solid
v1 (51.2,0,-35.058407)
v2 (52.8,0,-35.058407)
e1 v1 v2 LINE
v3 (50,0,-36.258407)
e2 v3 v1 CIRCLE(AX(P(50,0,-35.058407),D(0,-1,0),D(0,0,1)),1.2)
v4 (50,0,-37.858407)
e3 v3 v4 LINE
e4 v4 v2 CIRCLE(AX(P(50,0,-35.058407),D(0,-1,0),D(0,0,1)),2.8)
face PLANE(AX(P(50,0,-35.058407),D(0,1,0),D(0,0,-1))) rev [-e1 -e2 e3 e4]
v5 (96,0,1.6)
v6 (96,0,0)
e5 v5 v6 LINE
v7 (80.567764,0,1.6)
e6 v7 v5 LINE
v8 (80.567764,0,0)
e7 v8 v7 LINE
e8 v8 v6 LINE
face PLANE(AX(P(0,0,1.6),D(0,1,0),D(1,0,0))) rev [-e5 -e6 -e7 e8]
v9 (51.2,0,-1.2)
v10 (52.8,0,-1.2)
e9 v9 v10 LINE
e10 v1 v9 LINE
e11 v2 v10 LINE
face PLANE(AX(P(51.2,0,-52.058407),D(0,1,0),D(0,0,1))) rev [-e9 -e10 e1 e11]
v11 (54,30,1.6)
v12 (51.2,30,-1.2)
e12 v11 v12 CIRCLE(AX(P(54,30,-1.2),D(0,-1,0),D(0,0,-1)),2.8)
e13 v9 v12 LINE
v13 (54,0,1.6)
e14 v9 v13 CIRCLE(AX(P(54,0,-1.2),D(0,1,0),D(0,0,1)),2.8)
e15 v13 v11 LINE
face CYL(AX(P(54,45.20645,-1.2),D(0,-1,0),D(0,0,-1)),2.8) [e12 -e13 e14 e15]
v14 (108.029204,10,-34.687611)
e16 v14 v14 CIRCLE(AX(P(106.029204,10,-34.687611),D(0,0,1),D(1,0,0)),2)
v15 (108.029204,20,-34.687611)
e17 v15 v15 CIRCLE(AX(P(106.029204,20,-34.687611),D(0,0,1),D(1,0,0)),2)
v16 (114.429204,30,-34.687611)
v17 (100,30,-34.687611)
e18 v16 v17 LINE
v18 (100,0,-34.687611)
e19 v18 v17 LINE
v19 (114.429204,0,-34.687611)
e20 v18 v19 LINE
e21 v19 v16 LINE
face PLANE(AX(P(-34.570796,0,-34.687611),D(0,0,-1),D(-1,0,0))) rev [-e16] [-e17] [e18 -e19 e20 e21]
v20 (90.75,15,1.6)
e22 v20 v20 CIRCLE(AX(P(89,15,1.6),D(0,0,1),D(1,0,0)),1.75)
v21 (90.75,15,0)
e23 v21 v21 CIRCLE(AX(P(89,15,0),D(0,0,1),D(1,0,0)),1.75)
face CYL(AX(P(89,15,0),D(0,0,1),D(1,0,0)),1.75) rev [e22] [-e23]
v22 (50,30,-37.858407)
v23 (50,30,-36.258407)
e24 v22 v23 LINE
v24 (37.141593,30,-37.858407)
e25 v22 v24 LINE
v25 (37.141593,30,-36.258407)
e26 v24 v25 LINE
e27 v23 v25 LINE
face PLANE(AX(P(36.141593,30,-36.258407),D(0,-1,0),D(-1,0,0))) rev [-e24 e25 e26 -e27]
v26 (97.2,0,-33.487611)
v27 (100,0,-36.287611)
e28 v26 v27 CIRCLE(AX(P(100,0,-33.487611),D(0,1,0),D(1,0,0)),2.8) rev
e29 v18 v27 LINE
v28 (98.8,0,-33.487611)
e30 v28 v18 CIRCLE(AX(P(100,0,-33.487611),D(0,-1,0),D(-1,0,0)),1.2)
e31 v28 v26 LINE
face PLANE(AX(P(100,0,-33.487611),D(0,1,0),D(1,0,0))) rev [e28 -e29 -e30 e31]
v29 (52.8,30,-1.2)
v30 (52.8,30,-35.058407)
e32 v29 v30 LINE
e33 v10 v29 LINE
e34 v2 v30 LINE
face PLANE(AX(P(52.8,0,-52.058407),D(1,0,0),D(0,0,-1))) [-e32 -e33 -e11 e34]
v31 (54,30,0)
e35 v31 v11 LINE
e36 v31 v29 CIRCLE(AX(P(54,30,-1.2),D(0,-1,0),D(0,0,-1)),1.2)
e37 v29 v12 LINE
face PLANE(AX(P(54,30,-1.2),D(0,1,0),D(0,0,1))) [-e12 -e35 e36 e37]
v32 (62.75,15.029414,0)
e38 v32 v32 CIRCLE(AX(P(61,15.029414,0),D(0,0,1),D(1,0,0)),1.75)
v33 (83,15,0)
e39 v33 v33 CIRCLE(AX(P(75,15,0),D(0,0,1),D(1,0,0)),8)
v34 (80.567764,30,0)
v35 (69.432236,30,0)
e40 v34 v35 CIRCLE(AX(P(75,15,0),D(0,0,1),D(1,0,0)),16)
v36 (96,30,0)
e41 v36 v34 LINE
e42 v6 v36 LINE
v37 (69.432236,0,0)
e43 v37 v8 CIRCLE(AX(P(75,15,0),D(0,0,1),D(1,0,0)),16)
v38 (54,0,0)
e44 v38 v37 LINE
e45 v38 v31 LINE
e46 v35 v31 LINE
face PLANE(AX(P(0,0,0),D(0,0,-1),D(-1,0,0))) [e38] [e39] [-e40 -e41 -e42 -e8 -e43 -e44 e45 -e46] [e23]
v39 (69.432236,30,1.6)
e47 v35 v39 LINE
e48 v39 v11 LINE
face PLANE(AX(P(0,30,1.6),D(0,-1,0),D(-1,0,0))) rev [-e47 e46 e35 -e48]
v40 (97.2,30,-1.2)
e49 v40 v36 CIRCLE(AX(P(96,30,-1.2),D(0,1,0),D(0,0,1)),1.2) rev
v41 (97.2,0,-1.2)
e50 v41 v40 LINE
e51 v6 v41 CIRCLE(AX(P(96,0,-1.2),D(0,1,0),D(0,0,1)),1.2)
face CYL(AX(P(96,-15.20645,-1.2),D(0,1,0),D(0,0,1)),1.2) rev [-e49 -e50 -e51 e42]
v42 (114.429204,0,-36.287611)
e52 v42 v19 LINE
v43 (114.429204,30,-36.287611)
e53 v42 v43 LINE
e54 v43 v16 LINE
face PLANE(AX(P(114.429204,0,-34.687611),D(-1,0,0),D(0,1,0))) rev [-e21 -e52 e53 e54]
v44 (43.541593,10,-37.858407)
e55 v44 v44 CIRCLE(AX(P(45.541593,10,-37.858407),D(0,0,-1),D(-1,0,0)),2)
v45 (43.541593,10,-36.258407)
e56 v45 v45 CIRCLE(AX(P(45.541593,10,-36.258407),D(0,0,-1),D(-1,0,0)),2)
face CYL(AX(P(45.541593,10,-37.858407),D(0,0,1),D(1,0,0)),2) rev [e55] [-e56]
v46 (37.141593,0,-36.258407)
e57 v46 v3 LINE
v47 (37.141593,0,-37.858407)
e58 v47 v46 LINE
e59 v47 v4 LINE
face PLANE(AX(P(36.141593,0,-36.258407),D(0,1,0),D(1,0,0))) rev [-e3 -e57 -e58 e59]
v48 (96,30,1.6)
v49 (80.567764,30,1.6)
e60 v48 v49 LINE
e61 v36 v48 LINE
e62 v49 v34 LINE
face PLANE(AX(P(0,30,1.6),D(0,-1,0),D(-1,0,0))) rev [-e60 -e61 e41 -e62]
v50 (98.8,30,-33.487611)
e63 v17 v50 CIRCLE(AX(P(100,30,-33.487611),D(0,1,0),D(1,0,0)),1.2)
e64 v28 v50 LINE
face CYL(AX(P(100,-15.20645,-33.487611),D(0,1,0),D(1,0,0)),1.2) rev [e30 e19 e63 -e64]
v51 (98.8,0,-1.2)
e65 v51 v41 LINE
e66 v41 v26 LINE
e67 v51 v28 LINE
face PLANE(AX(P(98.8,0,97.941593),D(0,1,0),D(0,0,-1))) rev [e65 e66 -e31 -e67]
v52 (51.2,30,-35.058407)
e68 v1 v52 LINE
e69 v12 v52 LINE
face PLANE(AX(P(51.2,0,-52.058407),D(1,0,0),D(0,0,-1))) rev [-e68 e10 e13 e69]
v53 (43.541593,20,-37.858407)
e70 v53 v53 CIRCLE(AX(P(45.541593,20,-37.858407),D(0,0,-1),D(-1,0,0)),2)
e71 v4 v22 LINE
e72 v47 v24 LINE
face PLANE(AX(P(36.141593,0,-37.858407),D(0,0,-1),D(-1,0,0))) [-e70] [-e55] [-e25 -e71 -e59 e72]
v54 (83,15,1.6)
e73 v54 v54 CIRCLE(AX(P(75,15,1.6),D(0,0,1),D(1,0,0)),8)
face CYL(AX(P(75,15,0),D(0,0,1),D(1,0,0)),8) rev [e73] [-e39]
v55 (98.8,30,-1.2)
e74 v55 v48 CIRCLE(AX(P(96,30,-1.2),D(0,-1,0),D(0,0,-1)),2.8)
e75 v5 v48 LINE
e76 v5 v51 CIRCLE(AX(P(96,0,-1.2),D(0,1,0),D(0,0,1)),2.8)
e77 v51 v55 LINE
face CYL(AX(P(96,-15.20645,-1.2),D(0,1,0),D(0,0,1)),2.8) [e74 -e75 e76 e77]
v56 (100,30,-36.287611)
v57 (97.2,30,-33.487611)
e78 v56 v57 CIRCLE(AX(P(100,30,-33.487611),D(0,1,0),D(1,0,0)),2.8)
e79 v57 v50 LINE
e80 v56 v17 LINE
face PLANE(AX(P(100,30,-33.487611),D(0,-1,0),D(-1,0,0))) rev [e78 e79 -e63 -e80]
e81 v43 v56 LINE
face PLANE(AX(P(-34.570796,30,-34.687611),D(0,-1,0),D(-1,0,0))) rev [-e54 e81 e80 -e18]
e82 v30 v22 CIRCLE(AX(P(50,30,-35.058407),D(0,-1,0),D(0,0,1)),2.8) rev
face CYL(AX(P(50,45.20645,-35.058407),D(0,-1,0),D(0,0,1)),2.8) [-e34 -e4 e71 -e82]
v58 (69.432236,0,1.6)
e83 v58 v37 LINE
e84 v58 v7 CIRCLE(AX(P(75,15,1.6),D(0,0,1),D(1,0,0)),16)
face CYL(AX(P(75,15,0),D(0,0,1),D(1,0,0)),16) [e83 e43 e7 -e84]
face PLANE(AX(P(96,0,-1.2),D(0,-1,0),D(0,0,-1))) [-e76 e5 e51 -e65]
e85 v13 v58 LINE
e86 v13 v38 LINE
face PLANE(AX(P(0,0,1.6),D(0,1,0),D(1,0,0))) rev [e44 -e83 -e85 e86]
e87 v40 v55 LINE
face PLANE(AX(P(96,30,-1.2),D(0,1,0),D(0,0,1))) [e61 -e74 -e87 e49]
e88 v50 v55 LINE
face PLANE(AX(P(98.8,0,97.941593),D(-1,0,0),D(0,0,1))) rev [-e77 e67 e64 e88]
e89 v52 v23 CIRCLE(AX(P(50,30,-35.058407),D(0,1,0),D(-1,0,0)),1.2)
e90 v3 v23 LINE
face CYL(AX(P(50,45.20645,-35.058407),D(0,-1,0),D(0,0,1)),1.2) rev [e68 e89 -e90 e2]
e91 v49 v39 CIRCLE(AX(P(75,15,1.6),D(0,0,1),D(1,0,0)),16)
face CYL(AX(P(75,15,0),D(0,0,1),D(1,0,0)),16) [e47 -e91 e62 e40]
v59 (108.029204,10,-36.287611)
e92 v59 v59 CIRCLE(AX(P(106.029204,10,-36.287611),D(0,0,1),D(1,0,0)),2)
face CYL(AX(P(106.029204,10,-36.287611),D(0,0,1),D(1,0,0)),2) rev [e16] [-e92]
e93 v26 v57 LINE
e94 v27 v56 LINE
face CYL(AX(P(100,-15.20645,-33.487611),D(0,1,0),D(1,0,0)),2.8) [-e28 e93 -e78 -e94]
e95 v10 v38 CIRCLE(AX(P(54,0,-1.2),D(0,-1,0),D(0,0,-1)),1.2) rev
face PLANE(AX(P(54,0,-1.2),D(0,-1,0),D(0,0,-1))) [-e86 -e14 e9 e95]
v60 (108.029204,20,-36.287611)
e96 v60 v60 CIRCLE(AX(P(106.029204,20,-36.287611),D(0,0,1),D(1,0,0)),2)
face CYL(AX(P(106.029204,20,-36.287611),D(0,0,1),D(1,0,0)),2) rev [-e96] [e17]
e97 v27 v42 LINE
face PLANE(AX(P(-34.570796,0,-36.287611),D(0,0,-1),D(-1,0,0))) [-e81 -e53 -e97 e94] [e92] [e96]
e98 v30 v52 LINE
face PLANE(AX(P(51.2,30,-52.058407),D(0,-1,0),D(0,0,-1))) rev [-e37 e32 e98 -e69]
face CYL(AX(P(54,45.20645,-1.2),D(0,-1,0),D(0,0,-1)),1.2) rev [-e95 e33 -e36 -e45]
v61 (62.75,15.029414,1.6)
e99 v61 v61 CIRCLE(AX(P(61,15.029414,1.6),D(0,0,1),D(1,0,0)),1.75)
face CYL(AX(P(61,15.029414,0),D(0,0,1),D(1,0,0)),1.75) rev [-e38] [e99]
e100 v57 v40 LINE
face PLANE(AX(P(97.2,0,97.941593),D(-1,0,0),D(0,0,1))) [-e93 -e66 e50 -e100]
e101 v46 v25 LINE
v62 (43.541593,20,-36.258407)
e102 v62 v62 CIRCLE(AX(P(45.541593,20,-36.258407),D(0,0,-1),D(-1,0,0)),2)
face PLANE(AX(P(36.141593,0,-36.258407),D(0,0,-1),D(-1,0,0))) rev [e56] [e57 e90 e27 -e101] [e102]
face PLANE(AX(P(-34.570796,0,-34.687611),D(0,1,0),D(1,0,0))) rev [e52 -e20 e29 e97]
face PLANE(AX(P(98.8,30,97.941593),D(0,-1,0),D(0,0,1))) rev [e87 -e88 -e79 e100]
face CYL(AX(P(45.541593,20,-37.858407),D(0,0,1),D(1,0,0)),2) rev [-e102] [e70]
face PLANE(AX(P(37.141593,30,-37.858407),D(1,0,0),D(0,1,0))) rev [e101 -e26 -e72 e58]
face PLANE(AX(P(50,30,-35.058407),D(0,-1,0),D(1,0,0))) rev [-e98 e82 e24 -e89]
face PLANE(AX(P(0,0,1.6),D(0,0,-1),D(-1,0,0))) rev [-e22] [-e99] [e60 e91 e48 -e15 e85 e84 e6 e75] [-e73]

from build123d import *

# Parameters (mm, degrees)
SKETCH1_W                  = 149
SKETCH1_H                  = 30
BOSS_EXTRUDE1_DEPTH        = 1.6
SKETCH4_R                  = 16
BOSS_EXTRUDE2_DEPTH        = 1.6
SKETCH5_R                  = 8
CUT_EXTRUDE1_DEPTH         = 1.6
SKETCH6_R                  = 1.75
CUT_EXTRUDE2_DEPTH         = 1.6
SKETCH7_R                  = 2
CUT_EXTRUDE3_DEPTH         = 1.6
SKETCH8_W                  = 1
SKETCH8_H                  = 30
CUT_EXTRUDE4_DEPTH         = 1.6
SKETCHED_START             = 134.229203673
SKETCHED_BEND1_OUTLINE_W   = 30
SKETCHED_BEND1_OUTLINE_H   = 1.6
SKETCHED_BEND1_DEPTH       = 14.770796327
SKETCHED_START_2           = 132.629203673
SKETCHED_BEND1_2_OUTLINE_W = 30
SKETCHED_BEND1_2_OUTLINE_H = 15.629203673
SKETCHED_BEND1_2_OUTLINE_R = 2
SKETCHED_BEND1_2_DEPTH     = 1.304264
SKETCHED_START_3           = 134.060211673
SKETCHED_BEND1_3_OUTLINE_W = 30
SKETCHED_BEND1_3_OUTLINE_H = 1.6
SKETCHED_BEND1_3_DEPTH     = 0.168992
SKETCHED_START_4           = 131.429203673
SKETCHED_BEND1_4_OUTLINE_W = 30
SKETCHED_BEND1_4_OUTLINE_H = 15.629203673
SKETCHED_BEND1_4_OUTLINE_R = 2
SKETCHED_BEND1_4_DEPTH     = 2.8
SKETCHED_BEND1_5_DEPTH     = 30
SKETCHED_BEND3_DEPTH       = 30
SKETCHED_BEND3_2_DEPTH     = 7.9999999
SKETCHED_START_5           = 22.0000001
SKETCHED_BEND3_3_DEPTH     = 7.9999999
SKETCHED_START_6           = 12.0000001
SKETCHED_BEND3_4_DEPTH     = 5.9999998
SKETCHED_START_7           = 7.9999999
SKETCHED_BEND3_5_DEPTH     = 14.0000002
SKETCHED_START_8           = -36.28761102
SKETCHED_BEND3_6_OUTLINE_R = 2
SKETCHED_BEND3_6_DEPTH     = 1.6
SKETCHED_BEND4_DEPTH       = 30
SKETCHED_BEND4_2_DEPTH     = 7.9999999
SKETCHED_BEND4_3_DEPTH     = 7.9999999
SKETCHED_BEND4_4_DEPTH     = 5.9999998
SKETCHED_BEND4_5_DEPTH     = 14.0000002
SKETCHED_START_9           = 14.2
SKETCHED_BEND4_6_OUTLINE_R = 2
SKETCHED_BEND4_6_DEPTH     = 1.6
SKETCHED_BEND5_DEPTH       = 30
SKETCHED_BEND5_2_DEPTH     = 7.9999999
SKETCHED_BEND5_3_DEPTH     = 7.9999999
SKETCHED_BEND5_4_DEPTH     = 5.9999998
SKETCHED_BEND5_5_DEPTH     = 14.0000002
SKETCHED_START_10          = -37.858407346
SKETCHED_BEND5_6_OUTLINE_R = 2
SKETCHED_BEND5_6_DEPTH     = 1.6


with BuildPart() as part:
    # Sketch1 → Boss-Extrude1 (new body)
    with BuildSketch(Plane.XY):
        with Locations((74.5, 15)):
            Rectangle(SKETCH1_W, SKETCH1_H)
    extrude(amount=BOSS_EXTRUDE1_DEPTH)

    # Sketch4 → Boss-Extrude2 (add)
    with BuildSketch(Plane.XY.offset(1.6)):
        with Locations((75, 15)):
            Circle(SKETCH4_R)
    extrude(amount=-BOSS_EXTRUDE2_DEPTH)

    # Sketch5 → Cut-Extrude1 (cut)
    with BuildSketch(Plane.XY.offset(1.6)):
        with Locations((75, 15)):
            Circle(SKETCH5_R)
    extrude(amount=-CUT_EXTRUDE1_DEPTH, mode=Mode.SUBTRACT)

    # Sketch6 → Cut-Extrude2 (cut)
    with BuildSketch(Plane.XY.offset(1.6)):
        with Locations((89, 15)):
            Circle(SKETCH6_R)
        with Locations((61, 15.029414059)):
            Circle(SKETCH6_R)
    extrude(amount=-CUT_EXTRUDE2_DEPTH, mode=Mode.SUBTRACT)

    # Sketch7 → Cut-Extrude3 (cut)
    with BuildSketch(Plane.XY.offset(1.6)):
        with Locations((140.6, 20)):
            Circle(SKETCH7_R)
        with Locations((140.6, 10)):
            Circle(SKETCH7_R)
    cut_extrude3 = extrude(amount=-CUT_EXTRUDE3_DEPTH, mode=Mode.SUBTRACT)

    # Sketch8 → Cut-Extrude4 (cut)
    with BuildSketch(Plane.XY.offset(1.6)):
        with Locations((0.5, 15)):
            Rectangle(SKETCH8_W, SKETCH8_H)
    extrude(amount=-CUT_EXTRUDE4_DEPTH, mode=Mode.SUBTRACT)

    # Mirror1: Cut-Extrude3 across plane
    add(cut_extrude3.mirror(Plane(origin=(75, 0, 0), x_dir=(0, 0, 1), z_dir=(1, 0, 0))), mode=Mode.SUBTRACT)

    # Sketched Bend1: read off the stored shape, not the designer's step
    # Sketched Bend1 outline → Sketched Bend1 (cut)
    with BuildSketch(Plane.YZ.offset(SKETCHED_START)):
        with Locations((15, 0.8)):
            Rectangle(SKETCHED_BEND1_OUTLINE_W, SKETCHED_BEND1_OUTLINE_H)
    extrude(amount=SKETCHED_BEND1_DEPTH, mode=Mode.SUBTRACT)

    # Sketched Bend1 2 outline → Sketched Bend1 2 (add)
    with BuildSketch(Plane.YZ.offset(SKETCHED_START_2)):
        with Locations((15, 9.414601837)):
            Rectangle(SKETCHED_BEND1_2_OUTLINE_W, SKETCHED_BEND1_2_OUTLINE_H)
        with Locations((10, 8.829203673)):
            Circle(SKETCHED_BEND1_2_OUTLINE_R, mode=Mode.SUBTRACT)
        with Locations((20, 8.829203673)):
            Circle(SKETCHED_BEND1_2_OUTLINE_R, mode=Mode.SUBTRACT)
    extrude(amount=SKETCHED_BEND1_2_DEPTH)

    # Sketched Bend1 3 outline → Sketched Bend1 3 (cut)
    with BuildSketch(Plane.YZ.offset(SKETCHED_START_3)):
        with Locations((15, 0.8)):
            Rectangle(SKETCHED_BEND1_3_OUTLINE_W, SKETCHED_BEND1_3_OUTLINE_H)
    extrude(amount=SKETCHED_BEND1_3_DEPTH, mode=Mode.SUBTRACT)

    # Sketched Bend1 4 outline → Sketched Bend1 4 (add)
    with BuildSketch(Plane.YZ.offset(SKETCHED_START_4)):
        with Locations((15, 9.414601837)):
            Rectangle(SKETCHED_BEND1_4_OUTLINE_W, SKETCHED_BEND1_4_OUTLINE_H)
        with Locations((10, 8.829203673)):
            Circle(SKETCHED_BEND1_4_OUTLINE_R, mode=Mode.SUBTRACT)
        with Locations((20, 8.829203673)):
            Circle(SKETCHED_BEND1_4_OUTLINE_R, mode=Mode.SUBTRACT)
    extrude(amount=SKETCHED_BEND1_4_DEPTH)

    # Sketched Bend1 5 outline → Sketched Bend1 5 (cut)
    with BuildSketch(Plane(origin=(0, 0, 0), x_dir=(1, 0, 0), z_dir=(0, 1, 0))):
        with BuildLine():
            Line((131.429203673, -17.229203673), (132.629203673, -17.229203673))
            Line((132.629203673, -17.229203673), (132.629203673, -2.8))
            ThreePointArc((132.629203673, -2.8), (132.277731811, -1.951471862), (131.429203673, -1.6))
            Line((131.429203673, -1.6), (131.429203673, -17.229203673))
        make_face()
        with BuildLine():
            ThreePointArc((131.429203673, 0), (133.40910266, -0.820101012), (134.229203673, -2.8))
            Line((134.229203673, -2.8), (134.229203673, -1.6))
            Line((134.229203673, -1.6), (134.060211673, -1.6))
            Line((134.060211673, -1.6), (134.060211673, 0))
            Line((134.060211673, 0), (131.429203673, 0))
        make_face()
    extrude(amount=SKETCHED_BEND1_5_DEPTH, mode=Mode.SUBTRACT)

    # Sketched Bend3: read off the stored shape, not the designer's step
    # Sketched Bend3 outline → Sketched Bend3 (cut)
    with BuildSketch(Plane(origin=(0, 0, 0), x_dir=(1, 0, 0), z_dir=(0, 1, 0))):
        with BuildLine():
            Line((131.429203673, 0), (98.529822128, 0))
            ThreePointArc((98.529822128, 0), (97.496662954, -1.166431913), (96, -1.6))
            Line((96, -1.6), (131.429203673, -1.6))
            ThreePointArc((131.429203673, -1.6), (132.277731811, -1.951471862), (132.629203673, -2.8))
            Line((132.629203673, -2.8), (132.629203673, -17.229203673))
            Line((132.629203673, -17.229203673), (134.229203673, -17.229203673))
            Line((134.229203673, -17.229203673), (134.229203673, -2.8))
            ThreePointArc((134.229203673, -2.8), (133.40910266, -0.820101012), (131.429203673, 0))
        make_face()
    extrude(amount=SKETCHED_BEND3_DEPTH, mode=Mode.SUBTRACT)

    # Sketched Bend3 2 outline → Sketched Bend3 2 (add)
    with BuildSketch(Plane(origin=(0, 0, 0), x_dir=(1, 0, 0), z_dir=(0, 1, 0))):
        with BuildLine():
            ThreePointArc((100, 36.28761102), (98.020101013, 35.467510007), (97.2, 33.48761102))
            Line((97.2, 33.48761102), (97.2, 1.2))
            ThreePointArc((97.2, 1.2), (96.848528137, 0.351471863), (96, 0))
            Line((96, 0), (98.529822128, 0))
            ThreePointArc((98.529822128, 0), (98.731620577, 0.584980471), (98.8, 1.2))
            Line((98.8, 1.2), (98.8, 33.48761102))
            ThreePointArc((98.8, 33.48761102), (99.151471863, 34.336139157), (100, 34.68761102))
            Line((100, 34.68761102), (114.429203673, 34.68761102))
            Line((114.429203673, 34.68761102), (114.429203673, 36.28761102))
            Line((114.429203673, 36.28761102), (100, 36.28761102))
        make_face()
    extrude(amount=SKETCHED_BEND3_2_DEPTH)

    # Sketched Bend3 3 outline → Sketched Bend3 3 (add)
    with BuildSketch(Plane(origin=(0, 0, 0), x_dir=(1, 0, 0), z_dir=(0, 1, 0)).offset(SKETCHED_START_5)):
        with BuildLine():
            ThreePointArc((100, 36.28761102), (98.020101013, 35.467510007), (97.2, 33.48761102))
            Line((97.2, 33.48761102), (97.2, 1.2))
            ThreePointArc((97.2, 1.2), (96.848528137, 0.351471863), (96, 0))
            Line((96, 0), (98.529822128, 0))
            ThreePointArc((98.529822128, 0), (98.731620577, 0.584980471), (98.8, 1.2))
            Line((98.8, 1.2), (98.8, 33.48761102))
            ThreePointArc((98.8, 33.48761102), (99.151471863, 34.336139157), (100, 34.68761102))
            Line((100, 34.68761102), (114.429203673, 34.68761102))
            Line((114.429203673, 34.68761102), (114.429203673, 36.28761102))
            Line((114.429203673, 36.28761102), (100, 36.28761102))
        make_face()
    extrude(amount=SKETCHED_BEND3_3_DEPTH)

    # Sketched Bend3 4 outline → Sketched Bend3 4 (add)
    with BuildSketch(Plane(origin=(0, 0, 0), x_dir=(1, 0, 0), z_dir=(0, 1, 0)).offset(SKETCHED_START_6)):
        with BuildLine():
            ThreePointArc((100, 36.28761102), (98.020101013, 35.467510007), (97.2, 33.48761102))
            Line((97.2, 33.48761102), (97.2, 1.2))
            ThreePointArc((97.2, 1.2), (96.848528137, 0.351471863), (96, 0))
            Line((96, 0), (98.529822128, 0))
            ThreePointArc((98.529822128, 0), (98.731620577, 0.584980471), (98.8, 1.2))
            Line((98.8, 1.2), (98.8, 33.48761102))
            ThreePointArc((98.8, 33.48761102), (99.151471863, 34.336139157), (100, 34.68761102))
            Line((100, 34.68761102), (114.429203673, 34.68761102))
            Line((114.429203673, 34.68761102), (114.429203673, 36.28761102))
            Line((114.429203673, 36.28761102), (100, 36.28761102))
        make_face()
    extrude(amount=SKETCHED_BEND3_4_DEPTH)

    # Sketched Bend3 5 outline → Sketched Bend3 5 (add)
    with BuildSketch(Plane(origin=(0, 0, 0), x_dir=(1, 0, 0), z_dir=(0, 1, 0)).offset(SKETCHED_START_7)):
        with BuildLine():
            ThreePointArc((100, 36.28761102), (98.020101013, 35.467510007), (97.2, 33.48761102))
            Line((97.2, 33.48761102), (97.2, 1.2))
            ThreePointArc((97.2, 1.2), (96.848528137, 0.351471863), (96, 0))
            Line((96, 0), (98.529822128, 0))
            ThreePointArc((98.529822128, 0), (98.731620577, 0.584980471), (98.8, 1.2))
            Line((98.8, 1.2), (98.8, 33.48761102))
            ThreePointArc((98.8, 33.48761102), (99.151471863, 34.336139157), (100, 34.68761102))
            Line((100, 34.68761102), (114.429203673, 34.68761102))
            Line((114.429203673, 34.68761102), (114.429203673, 36.28761102))
            Line((114.429203673, 36.28761102), (100, 36.28761102))
        make_face()
    extrude(amount=SKETCHED_BEND3_5_DEPTH)

    # Sketched Bend3 6 outline → Sketched Bend3 6 (cut)
    with BuildSketch(Plane.XY.offset(SKETCHED_START_8)):
        with Locations((106.029203673, 20)):
            Circle(SKETCHED_BEND3_6_OUTLINE_R)
        with Locations((106.029203673, 10)):
            Circle(SKETCHED_BEND3_6_OUTLINE_R)
    extrude(amount=SKETCHED_BEND3_6_DEPTH, mode=Mode.SUBTRACT)

    # Sketched Bend4: read off the stored shape, not the designer's step
    # Sketched Bend4 outline → Sketched Bend4 (cut)
    with BuildSketch(Plane(origin=(0, 0, 0), x_dir=(1, 0, 0), z_dir=(0, 1, 0))):
        with BuildLine():
            Line((1, -1.6), (14.470177872, -1.6))
            ThreePointArc((14.470177872, -1.6), (15.503337046, -0.433568087), (17, 0))
            Line((17, 0), (1, 0))
            Line((1, 0), (1, -1.6))
        make_face()
    extrude(amount=SKETCHED_BEND4_DEPTH, mode=Mode.SUBTRACT)

    # Sketched Bend4 2 outline → Sketched Bend4 2 (add)
    with BuildSketch(Plane(origin=(0, 0, 0), x_dir=(1, 0, 0), z_dir=(0, 1, 0))):
        with BuildLine():
            Line((15.8, -15.658407346), (15.8, -2.8))
            ThreePointArc((15.8, -2.8), (16.151471863, -1.951471863), (17, -1.6))
            Line((17, -1.6), (14.470177872, -1.6))
            ThreePointArc((14.470177872, -1.6), (14.268379423, -2.184980471), (14.2, -2.8))
            Line((14.2, -2.8), (14.2, -15.658407346))
            Line((14.2, -15.658407346), (15.8, -15.658407346))
        make_face()
    extrude(amount=SKETCHED_BEND4_2_DEPTH)

    # Sketched Bend4 3 outline → Sketched Bend4 3 (add)
    with BuildSketch(Plane(origin=(0, 0, 0), x_dir=(1, 0, 0), z_dir=(0, 1, 0)).offset(SKETCHED_START_5)):
        with BuildLine():
            Line((15.8, -15.658407346), (15.8, -2.8))
            ThreePointArc((15.8, -2.8), (16.151471863, -1.951471863), (17, -1.6))
            Line((17, -1.6), (14.470177872, -1.6))
            ThreePointArc((14.470177872, -1.6), (14.268379423, -2.184980471), (14.2, -2.8))
            Line((14.2, -2.8), (14.2, -15.658407346))
            Line((14.2, -15.658407346), (15.8, -15.658407346))
        make_face()
    extrude(amount=SKETCHED_BEND4_3_DEPTH)

    # Sketched Bend4 4 outline → Sketched Bend4 4 (add)
    with BuildSketch(Plane(origin=(0, 0, 0), x_dir=(1, 0, 0), z_dir=(0, 1, 0)).offset(SKETCHED_START_6)):
        with BuildLine():
            Line((15.8, -15.658407346), (15.8, -2.8))
            ThreePointArc((15.8, -2.8), (16.151471863, -1.951471863), (17, -1.6))
            Line((17, -1.6), (14.470177872, -1.6))
            ThreePointArc((14.470177872, -1.6), (14.268379423, -2.184980471), (14.2, -2.8))
            Line((14.2, -2.8), (14.2, -15.658407346))
            Line((14.2, -15.658407346), (15.8, -15.658407346))
        make_face()
    extrude(amount=SKETCHED_BEND4_4_DEPTH)

    # Sketched Bend4 5 outline → Sketched Bend4 5 (add)
    with BuildSketch(Plane(origin=(0, 0, 0), x_dir=(1, 0, 0), z_dir=(0, 1, 0)).offset(SKETCHED_START_7)):
        with BuildLine():
            Line((15.8, -15.658407346), (15.8, -2.8))
            ThreePointArc((15.8, -2.8), (16.151471863, -1.951471863), (17, -1.6))
            Line((17, -1.6), (14.470177872, -1.6))
            ThreePointArc((14.470177872, -1.6), (14.268379423, -2.184980471), (14.2, -2.8))
            Line((14.2, -2.8), (14.2, -15.658407346))
            Line((14.2, -15.658407346), (15.8, -15.658407346))
        make_face()
    extrude(amount=SKETCHED_BEND4_5_DEPTH)

    # Sketched Bend4 6 outline → Sketched Bend4 6 (cut)
    with BuildSketch(Plane.YZ.offset(SKETCHED_START_9)):
        with Locations((20, 7.258407346)):
            Circle(SKETCHED_BEND4_6_OUTLINE_R)
        with Locations((10, 7.258407346)):
            Circle(SKETCHED_BEND4_6_OUTLINE_R)
    extrude(amount=SKETCHED_BEND4_6_DEPTH, mode=Mode.SUBTRACT)

    # Sketched Bend5: read off the stored shape, not the designer's step
    # Sketched Bend5 outline → Sketched Bend5 (cut)
    with BuildSketch(Plane(origin=(0, 0, 0), x_dir=(1, 0, 0), z_dir=(0, 1, 0))):
        with BuildLine():
            Line((17, -1.6), (54, -1.6))
            ThreePointArc((54, -1.6), (52.503337046, -1.166431913), (51.470177872, 0))
            Line((51.470177872, 0), (17, 0))
            ThreePointArc((17, 0), (15.020101013, -0.820101013), (14.2, -2.8))
            Line((14.2, -2.8), (14.2, -15.658407346))
            Line((14.2, -15.658407346), (15.8, -15.658407346))
            Line((15.8, -15.658407346), (15.8, -2.8))
            ThreePointArc((15.8, -2.8), (16.151471863, -1.951471863), (17, -1.6))
        make_face()
    extrude(amount=SKETCHED_BEND5_DEPTH, mode=Mode.SUBTRACT)

    # Sketched Bend5 2 outline → Sketched Bend5 2 (add)
    with BuildSketch(Plane(origin=(0, 0, 0), x_dir=(1, 0, 0), z_dir=(0, 1, 0))):
        with BuildLine():
            ThreePointArc((51.2, 1.2), (51.268379423, 0.584980471), (51.470177872, 0))
            Line((51.470177872, 0), (54, 0))
            ThreePointArc((54, 0), (53.151471863, 0.351471863), (52.8, 1.2))
            Line((52.8, 1.2), (52.8, 35.058407346))
            ThreePointArc((52.8, 35.058407346), (51.979898987, 37.038306333), (50, 37.858407346))
            Line((50, 37.858407346), (37.141592654, 37.858407346))
            Line((37.141592654, 37.858407346), (37.141592654, 36.258407346))
            Line((37.141592654, 36.258407346), (50, 36.258407346))
            ThreePointArc((50, 36.258407346), (50.848528138, 35.906935483), (51.2, 35.058407346))
            Line((51.2, 35.058407346), (51.2, 1.2))
        make_face()
    extrude(amount=SKETCHED_BEND5_2_DEPTH)

    # Sketched Bend5 3 outline → Sketched Bend5 3 (add)
    with BuildSketch(Plane(origin=(0, 0, 0), x_dir=(1, 0, 0), z_dir=(0, 1, 0)).offset(SKETCHED_START_5)):
        with BuildLine():
            ThreePointArc((51.2, 1.2), (51.268379423, 0.584980471), (51.470177872, 0))
            Line((51.470177872, 0), (54, 0))
            ThreePointArc((54, 0), (53.151471863, 0.351471863), (52.8, 1.2))
            Line((52.8, 1.2), (52.8, 35.058407346))
            ThreePointArc((52.8, 35.058407346), (51.979898987, 37.038306333), (50, 37.858407346))
            Line((50, 37.858407346), (37.141592654, 37.858407346))
            Line((37.141592654, 37.858407346), (37.141592654, 36.258407346))
            Line((37.141592654, 36.258407346), (50, 36.258407346))
            ThreePointArc((50, 36.258407346), (50.848528138, 35.906935483), (51.2, 35.058407346))
            Line((51.2, 35.058407346), (51.2, 1.2))
        make_face()
    extrude(amount=SKETCHED_BEND5_3_DEPTH)

    # Sketched Bend5 4 outline → Sketched Bend5 4 (add)
    with BuildSketch(Plane(origin=(0, 0, 0), x_dir=(1, 0, 0), z_dir=(0, 1, 0)).offset(SKETCHED_START_6)):
        with BuildLine():
            ThreePointArc((51.2, 1.2), (51.268379423, 0.584980471), (51.470177872, 0))
            Line((51.470177872, 0), (54, 0))
            ThreePointArc((54, 0), (53.151471863, 0.351471863), (52.8, 1.2))
            Line((52.8, 1.2), (52.8, 35.058407346))
            ThreePointArc((52.8, 35.058407346), (51.979898987, 37.038306333), (50, 37.858407346))
            Line((50, 37.858407346), (37.141592654, 37.858407346))
            Line((37.141592654, 37.858407346), (37.141592654, 36.258407346))
            Line((37.141592654, 36.258407346), (50, 36.258407346))
            ThreePointArc((50, 36.258407346), (50.848528138, 35.906935483), (51.2, 35.058407346))
            Line((51.2, 35.058407346), (51.2, 1.2))
        make_face()
    extrude(amount=SKETCHED_BEND5_4_DEPTH)

    # Sketched Bend5 5 outline → Sketched Bend5 5 (add)
    with BuildSketch(Plane(origin=(0, 0, 0), x_dir=(1, 0, 0), z_dir=(0, 1, 0)).offset(SKETCHED_START_7)):
        with BuildLine():
            ThreePointArc((51.2, 1.2), (51.268379423, 0.584980471), (51.470177872, 0))
            Line((51.470177872, 0), (54, 0))
            ThreePointArc((54, 0), (53.151471863, 0.351471863), (52.8, 1.2))
            Line((52.8, 1.2), (52.8, 35.058407346))
            ThreePointArc((52.8, 35.058407346), (51.979898987, 37.038306333), (50, 37.858407346))
            Line((50, 37.858407346), (37.141592654, 37.858407346))
            Line((37.141592654, 37.858407346), (37.141592654, 36.258407346))
            Line((37.141592654, 36.258407346), (50, 36.258407346))
            ThreePointArc((50, 36.258407346), (50.848528138, 35.906935483), (51.2, 35.058407346))
            Line((51.2, 35.058407346), (51.2, 1.2))
        make_face()
    extrude(amount=SKETCHED_BEND5_5_DEPTH)

    # Sketched Bend5 6 outline → Sketched Bend5 6 (cut)
    with BuildSketch(Plane.XY.offset(SKETCHED_START_10)):
        with Locations((45.541592654, 20)):
            Circle(SKETCHED_BEND5_6_OUTLINE_R)
        with Locations((45.541592654, 10)):
            Circle(SKETCHED_BEND5_6_OUTLINE_R)
    extrude(amount=SKETCHED_BEND5_6_DEPTH, mode=Mode.SUBTRACT)


solid = part.part
